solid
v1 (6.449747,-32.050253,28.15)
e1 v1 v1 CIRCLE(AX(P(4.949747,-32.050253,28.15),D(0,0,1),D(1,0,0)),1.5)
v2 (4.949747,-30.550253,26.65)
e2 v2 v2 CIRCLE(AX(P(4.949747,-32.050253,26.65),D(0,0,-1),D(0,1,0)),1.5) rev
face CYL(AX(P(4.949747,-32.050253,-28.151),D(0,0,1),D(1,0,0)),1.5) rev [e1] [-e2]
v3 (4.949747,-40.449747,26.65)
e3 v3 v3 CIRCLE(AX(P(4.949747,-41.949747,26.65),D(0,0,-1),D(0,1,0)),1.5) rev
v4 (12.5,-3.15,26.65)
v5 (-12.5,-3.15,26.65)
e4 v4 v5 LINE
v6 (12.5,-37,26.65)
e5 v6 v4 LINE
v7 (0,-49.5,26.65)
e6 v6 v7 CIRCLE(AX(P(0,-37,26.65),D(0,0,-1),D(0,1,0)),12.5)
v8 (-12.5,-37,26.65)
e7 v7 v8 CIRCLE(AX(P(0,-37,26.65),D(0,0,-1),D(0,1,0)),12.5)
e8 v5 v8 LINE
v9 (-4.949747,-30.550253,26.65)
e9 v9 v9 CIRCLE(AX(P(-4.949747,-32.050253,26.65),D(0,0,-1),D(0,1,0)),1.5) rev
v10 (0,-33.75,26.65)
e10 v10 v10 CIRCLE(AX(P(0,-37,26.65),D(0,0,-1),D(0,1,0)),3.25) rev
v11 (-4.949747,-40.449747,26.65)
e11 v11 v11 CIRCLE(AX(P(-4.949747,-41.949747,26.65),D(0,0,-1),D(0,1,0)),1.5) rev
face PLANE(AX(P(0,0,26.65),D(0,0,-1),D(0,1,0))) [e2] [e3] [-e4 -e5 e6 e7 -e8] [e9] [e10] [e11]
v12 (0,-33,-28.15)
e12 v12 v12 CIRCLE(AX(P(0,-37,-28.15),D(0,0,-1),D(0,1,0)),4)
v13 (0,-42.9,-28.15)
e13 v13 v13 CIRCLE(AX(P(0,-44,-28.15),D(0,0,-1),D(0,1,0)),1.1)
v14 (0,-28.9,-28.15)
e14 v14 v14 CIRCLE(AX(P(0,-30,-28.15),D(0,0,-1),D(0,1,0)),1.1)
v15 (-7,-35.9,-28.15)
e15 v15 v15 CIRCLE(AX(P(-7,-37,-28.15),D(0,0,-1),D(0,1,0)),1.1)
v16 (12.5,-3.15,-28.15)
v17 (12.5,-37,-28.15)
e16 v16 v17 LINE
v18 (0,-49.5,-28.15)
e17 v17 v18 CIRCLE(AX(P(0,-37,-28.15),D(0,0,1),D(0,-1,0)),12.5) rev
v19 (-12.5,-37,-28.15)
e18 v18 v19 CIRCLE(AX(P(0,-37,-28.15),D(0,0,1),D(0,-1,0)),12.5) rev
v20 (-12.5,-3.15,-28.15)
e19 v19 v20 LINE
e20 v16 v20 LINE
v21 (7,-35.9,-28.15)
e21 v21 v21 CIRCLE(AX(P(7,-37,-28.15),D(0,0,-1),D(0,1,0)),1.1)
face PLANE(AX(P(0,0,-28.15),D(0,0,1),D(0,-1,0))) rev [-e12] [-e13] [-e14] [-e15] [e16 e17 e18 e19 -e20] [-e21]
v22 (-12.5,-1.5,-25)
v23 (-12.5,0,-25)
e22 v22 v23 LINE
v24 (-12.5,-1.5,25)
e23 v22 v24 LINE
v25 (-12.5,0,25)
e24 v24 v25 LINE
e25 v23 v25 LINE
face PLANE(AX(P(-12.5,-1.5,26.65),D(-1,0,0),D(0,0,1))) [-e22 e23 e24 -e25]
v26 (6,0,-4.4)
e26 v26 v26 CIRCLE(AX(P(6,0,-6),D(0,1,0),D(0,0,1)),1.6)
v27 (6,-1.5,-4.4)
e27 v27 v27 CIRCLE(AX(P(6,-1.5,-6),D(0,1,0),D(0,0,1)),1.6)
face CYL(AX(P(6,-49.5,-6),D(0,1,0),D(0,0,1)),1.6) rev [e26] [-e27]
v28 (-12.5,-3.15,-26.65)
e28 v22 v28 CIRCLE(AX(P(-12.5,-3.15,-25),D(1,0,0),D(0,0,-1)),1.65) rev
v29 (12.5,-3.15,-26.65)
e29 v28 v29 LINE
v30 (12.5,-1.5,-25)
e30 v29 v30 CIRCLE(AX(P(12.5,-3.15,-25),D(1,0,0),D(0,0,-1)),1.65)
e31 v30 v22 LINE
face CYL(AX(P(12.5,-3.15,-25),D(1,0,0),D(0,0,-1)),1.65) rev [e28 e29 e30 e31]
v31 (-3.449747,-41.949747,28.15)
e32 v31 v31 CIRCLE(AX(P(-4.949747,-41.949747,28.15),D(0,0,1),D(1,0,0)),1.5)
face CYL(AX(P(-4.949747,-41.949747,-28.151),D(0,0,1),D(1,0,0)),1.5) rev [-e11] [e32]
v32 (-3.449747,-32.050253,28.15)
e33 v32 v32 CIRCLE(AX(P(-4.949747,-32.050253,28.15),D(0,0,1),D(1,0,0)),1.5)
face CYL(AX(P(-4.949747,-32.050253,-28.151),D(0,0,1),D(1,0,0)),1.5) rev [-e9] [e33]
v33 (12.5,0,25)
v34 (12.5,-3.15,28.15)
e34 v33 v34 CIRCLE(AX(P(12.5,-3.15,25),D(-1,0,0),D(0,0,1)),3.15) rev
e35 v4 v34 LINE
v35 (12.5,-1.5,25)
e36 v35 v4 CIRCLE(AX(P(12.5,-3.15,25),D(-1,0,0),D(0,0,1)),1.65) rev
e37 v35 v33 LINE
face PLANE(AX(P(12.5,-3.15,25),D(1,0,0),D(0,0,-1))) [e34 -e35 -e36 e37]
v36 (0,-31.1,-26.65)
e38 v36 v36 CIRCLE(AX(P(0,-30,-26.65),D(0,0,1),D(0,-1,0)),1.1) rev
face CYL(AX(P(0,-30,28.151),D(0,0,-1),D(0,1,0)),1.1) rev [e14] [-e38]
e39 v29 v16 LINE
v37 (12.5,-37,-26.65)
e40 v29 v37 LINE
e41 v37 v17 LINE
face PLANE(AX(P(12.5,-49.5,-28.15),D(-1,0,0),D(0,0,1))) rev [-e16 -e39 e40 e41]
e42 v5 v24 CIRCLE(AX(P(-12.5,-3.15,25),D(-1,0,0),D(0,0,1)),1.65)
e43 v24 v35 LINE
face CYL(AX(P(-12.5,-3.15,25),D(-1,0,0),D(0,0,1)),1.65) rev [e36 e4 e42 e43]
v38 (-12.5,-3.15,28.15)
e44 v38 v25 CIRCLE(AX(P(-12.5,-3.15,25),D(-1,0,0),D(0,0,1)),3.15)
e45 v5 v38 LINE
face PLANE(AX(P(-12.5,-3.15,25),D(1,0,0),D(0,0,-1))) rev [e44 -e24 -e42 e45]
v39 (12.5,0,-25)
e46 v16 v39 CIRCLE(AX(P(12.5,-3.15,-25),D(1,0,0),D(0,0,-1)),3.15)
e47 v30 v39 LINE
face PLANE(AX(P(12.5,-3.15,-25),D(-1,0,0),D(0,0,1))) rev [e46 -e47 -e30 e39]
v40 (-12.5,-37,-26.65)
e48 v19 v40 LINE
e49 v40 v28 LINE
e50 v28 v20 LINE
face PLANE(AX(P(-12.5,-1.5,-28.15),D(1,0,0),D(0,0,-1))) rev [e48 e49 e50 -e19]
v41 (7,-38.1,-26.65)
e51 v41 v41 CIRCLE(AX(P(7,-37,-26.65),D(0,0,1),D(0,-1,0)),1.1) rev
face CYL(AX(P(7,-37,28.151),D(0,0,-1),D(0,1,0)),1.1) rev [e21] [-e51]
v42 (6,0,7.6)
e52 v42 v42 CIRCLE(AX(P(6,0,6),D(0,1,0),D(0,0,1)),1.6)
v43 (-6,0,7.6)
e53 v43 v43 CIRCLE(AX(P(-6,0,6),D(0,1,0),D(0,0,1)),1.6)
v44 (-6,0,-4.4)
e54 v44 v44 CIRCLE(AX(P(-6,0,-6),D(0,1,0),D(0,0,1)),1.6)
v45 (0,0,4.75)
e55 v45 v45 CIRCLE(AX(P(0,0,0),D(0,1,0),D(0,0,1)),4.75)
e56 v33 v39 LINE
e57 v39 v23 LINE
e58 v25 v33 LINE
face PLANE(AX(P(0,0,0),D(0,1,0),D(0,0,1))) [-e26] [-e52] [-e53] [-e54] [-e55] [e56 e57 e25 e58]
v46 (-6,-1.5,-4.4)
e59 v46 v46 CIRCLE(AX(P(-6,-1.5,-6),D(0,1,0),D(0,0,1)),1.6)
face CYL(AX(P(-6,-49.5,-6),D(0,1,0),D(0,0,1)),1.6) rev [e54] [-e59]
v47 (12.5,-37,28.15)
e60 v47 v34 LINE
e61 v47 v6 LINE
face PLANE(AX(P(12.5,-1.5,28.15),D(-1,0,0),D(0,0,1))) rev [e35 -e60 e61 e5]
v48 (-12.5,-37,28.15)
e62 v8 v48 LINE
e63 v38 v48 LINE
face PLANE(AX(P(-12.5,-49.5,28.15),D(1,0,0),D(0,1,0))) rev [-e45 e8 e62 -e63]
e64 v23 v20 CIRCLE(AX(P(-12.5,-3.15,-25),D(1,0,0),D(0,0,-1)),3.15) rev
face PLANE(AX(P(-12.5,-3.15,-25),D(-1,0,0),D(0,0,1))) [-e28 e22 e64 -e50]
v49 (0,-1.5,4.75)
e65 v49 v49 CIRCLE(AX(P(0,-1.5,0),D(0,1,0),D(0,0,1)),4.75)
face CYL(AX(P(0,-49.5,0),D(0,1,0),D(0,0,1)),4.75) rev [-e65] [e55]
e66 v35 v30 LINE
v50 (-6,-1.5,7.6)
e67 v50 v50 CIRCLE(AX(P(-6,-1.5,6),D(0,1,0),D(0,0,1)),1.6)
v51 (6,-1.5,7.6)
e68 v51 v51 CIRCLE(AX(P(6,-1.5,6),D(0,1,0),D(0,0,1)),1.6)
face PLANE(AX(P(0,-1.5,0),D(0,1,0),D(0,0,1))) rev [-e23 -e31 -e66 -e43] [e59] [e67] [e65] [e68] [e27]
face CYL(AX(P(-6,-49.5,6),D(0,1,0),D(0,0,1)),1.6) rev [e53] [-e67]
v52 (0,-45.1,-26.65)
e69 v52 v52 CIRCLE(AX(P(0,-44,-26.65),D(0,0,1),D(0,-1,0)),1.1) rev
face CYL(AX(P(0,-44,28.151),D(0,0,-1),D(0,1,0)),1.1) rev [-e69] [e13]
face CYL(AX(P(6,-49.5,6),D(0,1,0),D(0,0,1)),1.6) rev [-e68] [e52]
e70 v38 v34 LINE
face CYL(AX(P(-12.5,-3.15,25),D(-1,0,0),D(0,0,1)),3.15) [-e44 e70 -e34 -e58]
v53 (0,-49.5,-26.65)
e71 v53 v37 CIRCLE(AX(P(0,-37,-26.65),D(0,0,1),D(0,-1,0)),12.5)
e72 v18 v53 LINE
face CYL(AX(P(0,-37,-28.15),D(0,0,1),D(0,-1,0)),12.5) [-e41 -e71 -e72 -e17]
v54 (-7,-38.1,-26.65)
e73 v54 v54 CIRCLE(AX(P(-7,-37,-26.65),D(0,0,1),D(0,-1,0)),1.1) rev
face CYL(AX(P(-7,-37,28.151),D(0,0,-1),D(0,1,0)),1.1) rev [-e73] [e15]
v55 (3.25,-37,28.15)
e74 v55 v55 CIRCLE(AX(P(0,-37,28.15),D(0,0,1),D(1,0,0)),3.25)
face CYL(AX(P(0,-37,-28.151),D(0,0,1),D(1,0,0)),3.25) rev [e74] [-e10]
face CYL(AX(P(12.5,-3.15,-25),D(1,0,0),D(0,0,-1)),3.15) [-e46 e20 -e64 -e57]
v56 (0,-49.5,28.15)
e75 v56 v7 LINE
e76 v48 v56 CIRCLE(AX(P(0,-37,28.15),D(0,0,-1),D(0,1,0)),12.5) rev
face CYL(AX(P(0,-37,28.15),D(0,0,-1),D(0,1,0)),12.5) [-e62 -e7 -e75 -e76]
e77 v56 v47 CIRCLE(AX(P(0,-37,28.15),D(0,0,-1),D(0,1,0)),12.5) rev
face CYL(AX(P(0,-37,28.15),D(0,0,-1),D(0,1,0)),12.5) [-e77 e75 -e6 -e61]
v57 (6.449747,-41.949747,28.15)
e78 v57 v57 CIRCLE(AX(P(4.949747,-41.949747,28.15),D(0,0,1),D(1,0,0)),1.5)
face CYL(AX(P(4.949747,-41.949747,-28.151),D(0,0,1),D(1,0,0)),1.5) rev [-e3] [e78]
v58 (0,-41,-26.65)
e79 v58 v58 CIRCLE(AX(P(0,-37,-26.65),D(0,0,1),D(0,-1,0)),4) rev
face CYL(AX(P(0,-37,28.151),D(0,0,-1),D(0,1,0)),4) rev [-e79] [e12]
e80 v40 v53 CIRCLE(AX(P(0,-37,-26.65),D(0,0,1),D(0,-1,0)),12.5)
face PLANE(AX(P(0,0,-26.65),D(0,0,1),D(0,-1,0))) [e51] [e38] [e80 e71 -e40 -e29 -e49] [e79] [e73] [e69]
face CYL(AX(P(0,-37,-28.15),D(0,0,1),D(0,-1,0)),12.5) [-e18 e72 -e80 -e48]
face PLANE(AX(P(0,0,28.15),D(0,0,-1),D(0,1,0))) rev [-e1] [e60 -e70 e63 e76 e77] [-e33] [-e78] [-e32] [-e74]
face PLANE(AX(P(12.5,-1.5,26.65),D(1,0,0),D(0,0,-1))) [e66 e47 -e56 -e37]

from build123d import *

# Parameters (mm, degrees)
SKETCH1_W                      = 25
SKETCH1_H                      = 53.3
BASE_FLANGE1_DEPTH             = 1.5
EDGE_FLANGE1_STRIP_W           = 9.3
EDGE_FLANGE1_STRIP_H           = 1.5
EDGE_FLANGE1_STRIP_CUT_DEPTH   = 25
EDGE_FLANGE1_STRIP_2_W         = 9.3
EDGE_FLANGE1_STRIP_2_H         = 1.5
EDGE_FLANGE1_STRIP_CUT_2_DEPTH = 25
EDGE_FLANGE1_DEPTH             = 25
EDGE_FLANGE1_BEND_DEPTH        = 25
CUT_EXTRUDE1_REACH             = 78.001
SKETCH12_R                     = 1.5
SKETCH12_R_2                   = 3.25
CUT_EXTRUDE2_REACH             = 78.001
SKETCH13_R                     = 4
SKETCH13_R_2                   = 1.1
FILLET1_R                      = 12.5
SKETCH17_R                     = 1.6
CUT_EXTRUDE3_DEPTH             = 59.30027873
SKETCH18_R                     = 4.75
CUT_EXTRUDE4_DEPTH             = 59.30027873


# Sheet-metal steps are written as plain solids
with BuildPart() as part:
    # Sketch1 → Base-Flange1 (new body)
    with BuildSketch(Plane(origin=(0, 0, 0), x_dir=(1, 0, 0), z_dir=(0, 1, 0))):
        Rectangle(SKETCH1_W, SKETCH1_H)
    extrude(amount=-BASE_FLANGE1_DEPTH)

    # Edge-Flange1 strip (across the edge) → Edge-Flange1 strip cut (cut)
    with BuildSketch(Plane(origin=(12.5, -1.5, 26.65), x_dir=(0, 0, -1), z_dir=(-1, 0, 0))):
        with Locations((-3, -0.75)):
            Rectangle(EDGE_FLANGE1_STRIP_W, EDGE_FLANGE1_STRIP_H)
    extrude(amount=EDGE_FLANGE1_STRIP_CUT_DEPTH, mode=Mode.SUBTRACT)

    # Edge-Flange1 strip 2 (across the edge) → Edge-Flange1 strip cut 2 (cut)
    with BuildSketch(Plane(origin=(-12.5, -1.5, -26.65), x_dir=(0, 0, 1), z_dir=(1, 0, 0))):
        with Locations((-3, -0.75)):
            Rectangle(EDGE_FLANGE1_STRIP_2_W, EDGE_FLANGE1_STRIP_2_H)
    extrude(amount=EDGE_FLANGE1_STRIP_CUT_2_DEPTH, mode=Mode.SUBTRACT)

    # Edge-Flange1 section (across the edge) → Edge-Flange1 (add)
    with BuildSketch(Plane(origin=(12.5, -1.5, 26.65), x_dir=(0, 0, -1), z_dir=(-1, 0, 0))):
        with BuildLine():
            Line((-1.5, 1.65), (-1.5, 48))
            Line((-1.5, 48), (0, 48))
            Line((0, 48), (0, 1.65))
            ThreePointArc((0, 1.65), (0.483273811, 0.483273811), (1.65, 0))
            Line((1.65, 0), (1.65, -1.5))
            ThreePointArc((1.65, -1.5), (-0.577386361, -0.577386361), (-1.5, 1.65))
        make_face()
    extrude(amount=EDGE_FLANGE1_DEPTH)

    # Edge-Flange1 section 2 (across the edge) → Edge-Flange1 bend (add)
    with BuildSketch(Plane(origin=(-12.5, -1.5, -26.65), x_dir=(0, 0, 1), z_dir=(1, 0, 0))):
        with BuildLine():
            Line((-1.5, 1.65), (-1.5, 48))
            Line((-1.5, 48), (0, 48))
            Line((0, 48), (0, 1.65))
            ThreePointArc((0, 1.65), (0.483273811, 0.483273811), (1.65, 0))
            Line((1.65, 0), (1.65, -1.5))
            ThreePointArc((1.65, -1.5), (-0.577386361, -0.577386361), (-1.5, 1.65))
        make_face()
    extrude(amount=EDGE_FLANGE1_BEND_DEPTH)

    # Sketch12 → Cut-Extrude1 (cut, up to next)
    with BuildSketch(Plane.XY.offset(28.15), mode=Mode.PRIVATE) as cut_extrude1_sk1:
        with Locations((-4.949747468, -32.050252532)):
            Circle(SKETCH12_R)
    cut_extrude1_tool1 = extrude(cut_extrude1_sk1.sketch, amount=-CUT_EXTRUDE1_REACH, mode=Mode.PRIVATE) & part.part
    # Sketch12 → Cut-Extrude1 (cut, up to next)
    with BuildSketch(Plane.XY.offset(28.15), mode=Mode.PRIVATE) as cut_extrude1_sk2:
        with Locations((4.949747468, -32.050252532)):
            Circle(SKETCH12_R)
    cut_extrude1_tool2 = extrude(cut_extrude1_sk2.sketch, amount=-CUT_EXTRUDE1_REACH, mode=Mode.PRIVATE) & part.part
    # Sketch12 → Cut-Extrude1 (cut, up to next)
    with BuildSketch(Plane.XY.offset(28.15), mode=Mode.PRIVATE) as cut_extrude1_sk3:
        with Locations((-4.949747468, -41.949747468)):
            Circle(SKETCH12_R)
    cut_extrude1_tool3 = extrude(cut_extrude1_sk3.sketch, amount=-CUT_EXTRUDE1_REACH, mode=Mode.PRIVATE) & part.part
    # Sketch12 → Cut-Extrude1 (cut, up to next)
    with BuildSketch(Plane.XY.offset(28.15), mode=Mode.PRIVATE) as cut_extrude1_sk4:
        with Locations((4.949747468, -41.949747468)):
            Circle(SKETCH12_R)
    cut_extrude1_tool4 = extrude(cut_extrude1_sk4.sketch, amount=-CUT_EXTRUDE1_REACH, mode=Mode.PRIVATE) & part.part
    # Sketch12 → Cut-Extrude1 (cut, up to next)
    with BuildSketch(Plane.XY.offset(28.15), mode=Mode.PRIVATE) as cut_extrude1_sk5:
        with Locations((0, -37)):
            Circle(SKETCH12_R_2)
    cut_extrude1_tool5 = extrude(cut_extrude1_sk5.sketch, amount=-CUT_EXTRUDE1_REACH, mode=Mode.PRIVATE) & part.part
    add(cut_extrude1_tool1.solids().sort_by_distance((-4.949747, -32.050253, 28.15))[0], mode=Mode.SUBTRACT)
    add(cut_extrude1_tool2.solids().sort_by_distance((4.949747, -32.050253, 28.15))[0], mode=Mode.SUBTRACT)
    add(cut_extrude1_tool3.solids().sort_by_distance((-4.949747, -41.949747, 28.15))[0], mode=Mode.SUBTRACT)
    add(cut_extrude1_tool4.solids().sort_by_distance((4.949747, -41.949747, 28.15))[0], mode=Mode.SUBTRACT)
    add(cut_extrude1_tool5.solids().sort_by_distance((0, -37, 28.15))[0], mode=Mode.SUBTRACT)

    # Sketch13 → Cut-Extrude2 (cut, up to next)
    with BuildSketch(Plane(origin=(0, 0, -28.15), x_dir=(-1, 0, 0), z_dir=(0, 0, -1)), mode=Mode.PRIVATE) as cut_extrude2_sk1:
        with Locations(Location((0, -37, 0), (0, 0, 90))):
            Circle(SKETCH13_R)
    cut_extrude2_tool1 = extrude(cut_extrude2_sk1.sketch, amount=-CUT_EXTRUDE2_REACH, mode=Mode.PRIVATE) & part.part
    # Sketch13 → Cut-Extrude2 (cut, up to next)
    with BuildSketch(Plane(origin=(0, 0, -28.15), x_dir=(-1, 0, 0), z_dir=(0, 0, -1)), mode=Mode.PRIVATE) as cut_extrude2_sk2:
        with Locations(Location((0, -44, 0), (0, 0, 90))):
            Circle(SKETCH13_R_2)
    cut_extrude2_tool2 = extrude(cut_extrude2_sk2.sketch, amount=-CUT_EXTRUDE2_REACH, mode=Mode.PRIVATE) & part.part
    # Sketch13 → Cut-Extrude2 (cut, up to next)
    with BuildSketch(Plane(origin=(0, 0, -28.15), x_dir=(-1, 0, 0), z_dir=(0, 0, -1)), mode=Mode.PRIVATE) as cut_extrude2_sk3:
        with Locations(Location((-7, -37, 0), (0, 0, 90))):
            Circle(SKETCH13_R_2)
    cut_extrude2_tool3 = extrude(cut_extrude2_sk3.sketch, amount=-CUT_EXTRUDE2_REACH, mode=Mode.PRIVATE) & part.part
    # Sketch13 → Cut-Extrude2 (cut, up to next)
    with BuildSketch(Plane(origin=(0, 0, -28.15), x_dir=(-1, 0, 0), z_dir=(0, 0, -1)), mode=Mode.PRIVATE) as cut_extrude2_sk4:
        with Locations(Location((0, -30, 0), (0, 0, 90))):
            Circle(SKETCH13_R_2)
    cut_extrude2_tool4 = extrude(cut_extrude2_sk4.sketch, amount=-CUT_EXTRUDE2_REACH, mode=Mode.PRIVATE) & part.part
    # Sketch13 → Cut-Extrude2 (cut, up to next)
    with BuildSketch(Plane(origin=(0, 0, -28.15), x_dir=(-1, 0, 0), z_dir=(0, 0, -1)), mode=Mode.PRIVATE) as cut_extrude2_sk5:
        with Locations(Location((7, -37, 0), (0, 0, 90))):
            Circle(SKETCH13_R_2)
    cut_extrude2_tool5 = extrude(cut_extrude2_sk5.sketch, amount=-CUT_EXTRUDE2_REACH, mode=Mode.PRIVATE) & part.part
    add(cut_extrude2_tool1.solids().sort_by_distance((0, -37, -28.15))[0], mode=Mode.SUBTRACT)
    add(cut_extrude2_tool2.solids().sort_by_distance((0, -44, -28.15))[0], mode=Mode.SUBTRACT)
    add(cut_extrude2_tool3.solids().sort_by_distance((7, -37, -28.15))[0], mode=Mode.SUBTRACT)
    add(cut_extrude2_tool4.solids().sort_by_distance((0, -30, -28.15))[0], mode=Mode.SUBTRACT)
    add(cut_extrude2_tool5.solids().sort_by_distance((-7, -37, -28.15))[0], mode=Mode.SUBTRACT)

    # Fillet1
    fillet1_edges = [part.edges().sort_by_distance(p)[0] for p in [
        (12.5, -49.5, 27.4),
        (-12.5, -49.5, 27.4),
        (-12.5, -49.5, -27.4),
        (12.5, -49.5, -27.4),
    ]]
    fillet(fillet1_edges, radius=FILLET1_R - 0.0001)  # a hair under: the kernel refuses the full size

    # Sketch17 → Cut-Extrude3 (cut, through all)
    with BuildSketch(Plane(origin=(0, 0, 0), x_dir=(1, 0, 0), z_dir=(0, 1, 0))):
        with Locations(Location((-6, 6, 0), (0, 0, 270))):
            Circle(SKETCH17_R)
        with Locations(Location((6, 6, 0), (0, 0, 270))):
            Circle(SKETCH17_R)
        with Locations(Location((6, -6, 0), (0, 0, 270))):
            Circle(SKETCH17_R)
        with Locations(Location((-6, -6, 0), (0, 0, 270))):
            Circle(SKETCH17_R)
    extrude(amount=-CUT_EXTRUDE3_DEPTH, mode=Mode.SUBTRACT)

    # Sketch18 → Cut-Extrude4 (cut, through all)
    with BuildSketch(Plane(origin=(0, 0, 0), x_dir=(1, 0, 0), z_dir=(0, 1, 0))):
        with Locations(Location((0, 0, 0), (0, 0, 270))):
            Circle(SKETCH18_R)
    extrude(amount=-CUT_EXTRUDE4_DEPTH, mode=Mode.SUBTRACT)


solid = part.part
